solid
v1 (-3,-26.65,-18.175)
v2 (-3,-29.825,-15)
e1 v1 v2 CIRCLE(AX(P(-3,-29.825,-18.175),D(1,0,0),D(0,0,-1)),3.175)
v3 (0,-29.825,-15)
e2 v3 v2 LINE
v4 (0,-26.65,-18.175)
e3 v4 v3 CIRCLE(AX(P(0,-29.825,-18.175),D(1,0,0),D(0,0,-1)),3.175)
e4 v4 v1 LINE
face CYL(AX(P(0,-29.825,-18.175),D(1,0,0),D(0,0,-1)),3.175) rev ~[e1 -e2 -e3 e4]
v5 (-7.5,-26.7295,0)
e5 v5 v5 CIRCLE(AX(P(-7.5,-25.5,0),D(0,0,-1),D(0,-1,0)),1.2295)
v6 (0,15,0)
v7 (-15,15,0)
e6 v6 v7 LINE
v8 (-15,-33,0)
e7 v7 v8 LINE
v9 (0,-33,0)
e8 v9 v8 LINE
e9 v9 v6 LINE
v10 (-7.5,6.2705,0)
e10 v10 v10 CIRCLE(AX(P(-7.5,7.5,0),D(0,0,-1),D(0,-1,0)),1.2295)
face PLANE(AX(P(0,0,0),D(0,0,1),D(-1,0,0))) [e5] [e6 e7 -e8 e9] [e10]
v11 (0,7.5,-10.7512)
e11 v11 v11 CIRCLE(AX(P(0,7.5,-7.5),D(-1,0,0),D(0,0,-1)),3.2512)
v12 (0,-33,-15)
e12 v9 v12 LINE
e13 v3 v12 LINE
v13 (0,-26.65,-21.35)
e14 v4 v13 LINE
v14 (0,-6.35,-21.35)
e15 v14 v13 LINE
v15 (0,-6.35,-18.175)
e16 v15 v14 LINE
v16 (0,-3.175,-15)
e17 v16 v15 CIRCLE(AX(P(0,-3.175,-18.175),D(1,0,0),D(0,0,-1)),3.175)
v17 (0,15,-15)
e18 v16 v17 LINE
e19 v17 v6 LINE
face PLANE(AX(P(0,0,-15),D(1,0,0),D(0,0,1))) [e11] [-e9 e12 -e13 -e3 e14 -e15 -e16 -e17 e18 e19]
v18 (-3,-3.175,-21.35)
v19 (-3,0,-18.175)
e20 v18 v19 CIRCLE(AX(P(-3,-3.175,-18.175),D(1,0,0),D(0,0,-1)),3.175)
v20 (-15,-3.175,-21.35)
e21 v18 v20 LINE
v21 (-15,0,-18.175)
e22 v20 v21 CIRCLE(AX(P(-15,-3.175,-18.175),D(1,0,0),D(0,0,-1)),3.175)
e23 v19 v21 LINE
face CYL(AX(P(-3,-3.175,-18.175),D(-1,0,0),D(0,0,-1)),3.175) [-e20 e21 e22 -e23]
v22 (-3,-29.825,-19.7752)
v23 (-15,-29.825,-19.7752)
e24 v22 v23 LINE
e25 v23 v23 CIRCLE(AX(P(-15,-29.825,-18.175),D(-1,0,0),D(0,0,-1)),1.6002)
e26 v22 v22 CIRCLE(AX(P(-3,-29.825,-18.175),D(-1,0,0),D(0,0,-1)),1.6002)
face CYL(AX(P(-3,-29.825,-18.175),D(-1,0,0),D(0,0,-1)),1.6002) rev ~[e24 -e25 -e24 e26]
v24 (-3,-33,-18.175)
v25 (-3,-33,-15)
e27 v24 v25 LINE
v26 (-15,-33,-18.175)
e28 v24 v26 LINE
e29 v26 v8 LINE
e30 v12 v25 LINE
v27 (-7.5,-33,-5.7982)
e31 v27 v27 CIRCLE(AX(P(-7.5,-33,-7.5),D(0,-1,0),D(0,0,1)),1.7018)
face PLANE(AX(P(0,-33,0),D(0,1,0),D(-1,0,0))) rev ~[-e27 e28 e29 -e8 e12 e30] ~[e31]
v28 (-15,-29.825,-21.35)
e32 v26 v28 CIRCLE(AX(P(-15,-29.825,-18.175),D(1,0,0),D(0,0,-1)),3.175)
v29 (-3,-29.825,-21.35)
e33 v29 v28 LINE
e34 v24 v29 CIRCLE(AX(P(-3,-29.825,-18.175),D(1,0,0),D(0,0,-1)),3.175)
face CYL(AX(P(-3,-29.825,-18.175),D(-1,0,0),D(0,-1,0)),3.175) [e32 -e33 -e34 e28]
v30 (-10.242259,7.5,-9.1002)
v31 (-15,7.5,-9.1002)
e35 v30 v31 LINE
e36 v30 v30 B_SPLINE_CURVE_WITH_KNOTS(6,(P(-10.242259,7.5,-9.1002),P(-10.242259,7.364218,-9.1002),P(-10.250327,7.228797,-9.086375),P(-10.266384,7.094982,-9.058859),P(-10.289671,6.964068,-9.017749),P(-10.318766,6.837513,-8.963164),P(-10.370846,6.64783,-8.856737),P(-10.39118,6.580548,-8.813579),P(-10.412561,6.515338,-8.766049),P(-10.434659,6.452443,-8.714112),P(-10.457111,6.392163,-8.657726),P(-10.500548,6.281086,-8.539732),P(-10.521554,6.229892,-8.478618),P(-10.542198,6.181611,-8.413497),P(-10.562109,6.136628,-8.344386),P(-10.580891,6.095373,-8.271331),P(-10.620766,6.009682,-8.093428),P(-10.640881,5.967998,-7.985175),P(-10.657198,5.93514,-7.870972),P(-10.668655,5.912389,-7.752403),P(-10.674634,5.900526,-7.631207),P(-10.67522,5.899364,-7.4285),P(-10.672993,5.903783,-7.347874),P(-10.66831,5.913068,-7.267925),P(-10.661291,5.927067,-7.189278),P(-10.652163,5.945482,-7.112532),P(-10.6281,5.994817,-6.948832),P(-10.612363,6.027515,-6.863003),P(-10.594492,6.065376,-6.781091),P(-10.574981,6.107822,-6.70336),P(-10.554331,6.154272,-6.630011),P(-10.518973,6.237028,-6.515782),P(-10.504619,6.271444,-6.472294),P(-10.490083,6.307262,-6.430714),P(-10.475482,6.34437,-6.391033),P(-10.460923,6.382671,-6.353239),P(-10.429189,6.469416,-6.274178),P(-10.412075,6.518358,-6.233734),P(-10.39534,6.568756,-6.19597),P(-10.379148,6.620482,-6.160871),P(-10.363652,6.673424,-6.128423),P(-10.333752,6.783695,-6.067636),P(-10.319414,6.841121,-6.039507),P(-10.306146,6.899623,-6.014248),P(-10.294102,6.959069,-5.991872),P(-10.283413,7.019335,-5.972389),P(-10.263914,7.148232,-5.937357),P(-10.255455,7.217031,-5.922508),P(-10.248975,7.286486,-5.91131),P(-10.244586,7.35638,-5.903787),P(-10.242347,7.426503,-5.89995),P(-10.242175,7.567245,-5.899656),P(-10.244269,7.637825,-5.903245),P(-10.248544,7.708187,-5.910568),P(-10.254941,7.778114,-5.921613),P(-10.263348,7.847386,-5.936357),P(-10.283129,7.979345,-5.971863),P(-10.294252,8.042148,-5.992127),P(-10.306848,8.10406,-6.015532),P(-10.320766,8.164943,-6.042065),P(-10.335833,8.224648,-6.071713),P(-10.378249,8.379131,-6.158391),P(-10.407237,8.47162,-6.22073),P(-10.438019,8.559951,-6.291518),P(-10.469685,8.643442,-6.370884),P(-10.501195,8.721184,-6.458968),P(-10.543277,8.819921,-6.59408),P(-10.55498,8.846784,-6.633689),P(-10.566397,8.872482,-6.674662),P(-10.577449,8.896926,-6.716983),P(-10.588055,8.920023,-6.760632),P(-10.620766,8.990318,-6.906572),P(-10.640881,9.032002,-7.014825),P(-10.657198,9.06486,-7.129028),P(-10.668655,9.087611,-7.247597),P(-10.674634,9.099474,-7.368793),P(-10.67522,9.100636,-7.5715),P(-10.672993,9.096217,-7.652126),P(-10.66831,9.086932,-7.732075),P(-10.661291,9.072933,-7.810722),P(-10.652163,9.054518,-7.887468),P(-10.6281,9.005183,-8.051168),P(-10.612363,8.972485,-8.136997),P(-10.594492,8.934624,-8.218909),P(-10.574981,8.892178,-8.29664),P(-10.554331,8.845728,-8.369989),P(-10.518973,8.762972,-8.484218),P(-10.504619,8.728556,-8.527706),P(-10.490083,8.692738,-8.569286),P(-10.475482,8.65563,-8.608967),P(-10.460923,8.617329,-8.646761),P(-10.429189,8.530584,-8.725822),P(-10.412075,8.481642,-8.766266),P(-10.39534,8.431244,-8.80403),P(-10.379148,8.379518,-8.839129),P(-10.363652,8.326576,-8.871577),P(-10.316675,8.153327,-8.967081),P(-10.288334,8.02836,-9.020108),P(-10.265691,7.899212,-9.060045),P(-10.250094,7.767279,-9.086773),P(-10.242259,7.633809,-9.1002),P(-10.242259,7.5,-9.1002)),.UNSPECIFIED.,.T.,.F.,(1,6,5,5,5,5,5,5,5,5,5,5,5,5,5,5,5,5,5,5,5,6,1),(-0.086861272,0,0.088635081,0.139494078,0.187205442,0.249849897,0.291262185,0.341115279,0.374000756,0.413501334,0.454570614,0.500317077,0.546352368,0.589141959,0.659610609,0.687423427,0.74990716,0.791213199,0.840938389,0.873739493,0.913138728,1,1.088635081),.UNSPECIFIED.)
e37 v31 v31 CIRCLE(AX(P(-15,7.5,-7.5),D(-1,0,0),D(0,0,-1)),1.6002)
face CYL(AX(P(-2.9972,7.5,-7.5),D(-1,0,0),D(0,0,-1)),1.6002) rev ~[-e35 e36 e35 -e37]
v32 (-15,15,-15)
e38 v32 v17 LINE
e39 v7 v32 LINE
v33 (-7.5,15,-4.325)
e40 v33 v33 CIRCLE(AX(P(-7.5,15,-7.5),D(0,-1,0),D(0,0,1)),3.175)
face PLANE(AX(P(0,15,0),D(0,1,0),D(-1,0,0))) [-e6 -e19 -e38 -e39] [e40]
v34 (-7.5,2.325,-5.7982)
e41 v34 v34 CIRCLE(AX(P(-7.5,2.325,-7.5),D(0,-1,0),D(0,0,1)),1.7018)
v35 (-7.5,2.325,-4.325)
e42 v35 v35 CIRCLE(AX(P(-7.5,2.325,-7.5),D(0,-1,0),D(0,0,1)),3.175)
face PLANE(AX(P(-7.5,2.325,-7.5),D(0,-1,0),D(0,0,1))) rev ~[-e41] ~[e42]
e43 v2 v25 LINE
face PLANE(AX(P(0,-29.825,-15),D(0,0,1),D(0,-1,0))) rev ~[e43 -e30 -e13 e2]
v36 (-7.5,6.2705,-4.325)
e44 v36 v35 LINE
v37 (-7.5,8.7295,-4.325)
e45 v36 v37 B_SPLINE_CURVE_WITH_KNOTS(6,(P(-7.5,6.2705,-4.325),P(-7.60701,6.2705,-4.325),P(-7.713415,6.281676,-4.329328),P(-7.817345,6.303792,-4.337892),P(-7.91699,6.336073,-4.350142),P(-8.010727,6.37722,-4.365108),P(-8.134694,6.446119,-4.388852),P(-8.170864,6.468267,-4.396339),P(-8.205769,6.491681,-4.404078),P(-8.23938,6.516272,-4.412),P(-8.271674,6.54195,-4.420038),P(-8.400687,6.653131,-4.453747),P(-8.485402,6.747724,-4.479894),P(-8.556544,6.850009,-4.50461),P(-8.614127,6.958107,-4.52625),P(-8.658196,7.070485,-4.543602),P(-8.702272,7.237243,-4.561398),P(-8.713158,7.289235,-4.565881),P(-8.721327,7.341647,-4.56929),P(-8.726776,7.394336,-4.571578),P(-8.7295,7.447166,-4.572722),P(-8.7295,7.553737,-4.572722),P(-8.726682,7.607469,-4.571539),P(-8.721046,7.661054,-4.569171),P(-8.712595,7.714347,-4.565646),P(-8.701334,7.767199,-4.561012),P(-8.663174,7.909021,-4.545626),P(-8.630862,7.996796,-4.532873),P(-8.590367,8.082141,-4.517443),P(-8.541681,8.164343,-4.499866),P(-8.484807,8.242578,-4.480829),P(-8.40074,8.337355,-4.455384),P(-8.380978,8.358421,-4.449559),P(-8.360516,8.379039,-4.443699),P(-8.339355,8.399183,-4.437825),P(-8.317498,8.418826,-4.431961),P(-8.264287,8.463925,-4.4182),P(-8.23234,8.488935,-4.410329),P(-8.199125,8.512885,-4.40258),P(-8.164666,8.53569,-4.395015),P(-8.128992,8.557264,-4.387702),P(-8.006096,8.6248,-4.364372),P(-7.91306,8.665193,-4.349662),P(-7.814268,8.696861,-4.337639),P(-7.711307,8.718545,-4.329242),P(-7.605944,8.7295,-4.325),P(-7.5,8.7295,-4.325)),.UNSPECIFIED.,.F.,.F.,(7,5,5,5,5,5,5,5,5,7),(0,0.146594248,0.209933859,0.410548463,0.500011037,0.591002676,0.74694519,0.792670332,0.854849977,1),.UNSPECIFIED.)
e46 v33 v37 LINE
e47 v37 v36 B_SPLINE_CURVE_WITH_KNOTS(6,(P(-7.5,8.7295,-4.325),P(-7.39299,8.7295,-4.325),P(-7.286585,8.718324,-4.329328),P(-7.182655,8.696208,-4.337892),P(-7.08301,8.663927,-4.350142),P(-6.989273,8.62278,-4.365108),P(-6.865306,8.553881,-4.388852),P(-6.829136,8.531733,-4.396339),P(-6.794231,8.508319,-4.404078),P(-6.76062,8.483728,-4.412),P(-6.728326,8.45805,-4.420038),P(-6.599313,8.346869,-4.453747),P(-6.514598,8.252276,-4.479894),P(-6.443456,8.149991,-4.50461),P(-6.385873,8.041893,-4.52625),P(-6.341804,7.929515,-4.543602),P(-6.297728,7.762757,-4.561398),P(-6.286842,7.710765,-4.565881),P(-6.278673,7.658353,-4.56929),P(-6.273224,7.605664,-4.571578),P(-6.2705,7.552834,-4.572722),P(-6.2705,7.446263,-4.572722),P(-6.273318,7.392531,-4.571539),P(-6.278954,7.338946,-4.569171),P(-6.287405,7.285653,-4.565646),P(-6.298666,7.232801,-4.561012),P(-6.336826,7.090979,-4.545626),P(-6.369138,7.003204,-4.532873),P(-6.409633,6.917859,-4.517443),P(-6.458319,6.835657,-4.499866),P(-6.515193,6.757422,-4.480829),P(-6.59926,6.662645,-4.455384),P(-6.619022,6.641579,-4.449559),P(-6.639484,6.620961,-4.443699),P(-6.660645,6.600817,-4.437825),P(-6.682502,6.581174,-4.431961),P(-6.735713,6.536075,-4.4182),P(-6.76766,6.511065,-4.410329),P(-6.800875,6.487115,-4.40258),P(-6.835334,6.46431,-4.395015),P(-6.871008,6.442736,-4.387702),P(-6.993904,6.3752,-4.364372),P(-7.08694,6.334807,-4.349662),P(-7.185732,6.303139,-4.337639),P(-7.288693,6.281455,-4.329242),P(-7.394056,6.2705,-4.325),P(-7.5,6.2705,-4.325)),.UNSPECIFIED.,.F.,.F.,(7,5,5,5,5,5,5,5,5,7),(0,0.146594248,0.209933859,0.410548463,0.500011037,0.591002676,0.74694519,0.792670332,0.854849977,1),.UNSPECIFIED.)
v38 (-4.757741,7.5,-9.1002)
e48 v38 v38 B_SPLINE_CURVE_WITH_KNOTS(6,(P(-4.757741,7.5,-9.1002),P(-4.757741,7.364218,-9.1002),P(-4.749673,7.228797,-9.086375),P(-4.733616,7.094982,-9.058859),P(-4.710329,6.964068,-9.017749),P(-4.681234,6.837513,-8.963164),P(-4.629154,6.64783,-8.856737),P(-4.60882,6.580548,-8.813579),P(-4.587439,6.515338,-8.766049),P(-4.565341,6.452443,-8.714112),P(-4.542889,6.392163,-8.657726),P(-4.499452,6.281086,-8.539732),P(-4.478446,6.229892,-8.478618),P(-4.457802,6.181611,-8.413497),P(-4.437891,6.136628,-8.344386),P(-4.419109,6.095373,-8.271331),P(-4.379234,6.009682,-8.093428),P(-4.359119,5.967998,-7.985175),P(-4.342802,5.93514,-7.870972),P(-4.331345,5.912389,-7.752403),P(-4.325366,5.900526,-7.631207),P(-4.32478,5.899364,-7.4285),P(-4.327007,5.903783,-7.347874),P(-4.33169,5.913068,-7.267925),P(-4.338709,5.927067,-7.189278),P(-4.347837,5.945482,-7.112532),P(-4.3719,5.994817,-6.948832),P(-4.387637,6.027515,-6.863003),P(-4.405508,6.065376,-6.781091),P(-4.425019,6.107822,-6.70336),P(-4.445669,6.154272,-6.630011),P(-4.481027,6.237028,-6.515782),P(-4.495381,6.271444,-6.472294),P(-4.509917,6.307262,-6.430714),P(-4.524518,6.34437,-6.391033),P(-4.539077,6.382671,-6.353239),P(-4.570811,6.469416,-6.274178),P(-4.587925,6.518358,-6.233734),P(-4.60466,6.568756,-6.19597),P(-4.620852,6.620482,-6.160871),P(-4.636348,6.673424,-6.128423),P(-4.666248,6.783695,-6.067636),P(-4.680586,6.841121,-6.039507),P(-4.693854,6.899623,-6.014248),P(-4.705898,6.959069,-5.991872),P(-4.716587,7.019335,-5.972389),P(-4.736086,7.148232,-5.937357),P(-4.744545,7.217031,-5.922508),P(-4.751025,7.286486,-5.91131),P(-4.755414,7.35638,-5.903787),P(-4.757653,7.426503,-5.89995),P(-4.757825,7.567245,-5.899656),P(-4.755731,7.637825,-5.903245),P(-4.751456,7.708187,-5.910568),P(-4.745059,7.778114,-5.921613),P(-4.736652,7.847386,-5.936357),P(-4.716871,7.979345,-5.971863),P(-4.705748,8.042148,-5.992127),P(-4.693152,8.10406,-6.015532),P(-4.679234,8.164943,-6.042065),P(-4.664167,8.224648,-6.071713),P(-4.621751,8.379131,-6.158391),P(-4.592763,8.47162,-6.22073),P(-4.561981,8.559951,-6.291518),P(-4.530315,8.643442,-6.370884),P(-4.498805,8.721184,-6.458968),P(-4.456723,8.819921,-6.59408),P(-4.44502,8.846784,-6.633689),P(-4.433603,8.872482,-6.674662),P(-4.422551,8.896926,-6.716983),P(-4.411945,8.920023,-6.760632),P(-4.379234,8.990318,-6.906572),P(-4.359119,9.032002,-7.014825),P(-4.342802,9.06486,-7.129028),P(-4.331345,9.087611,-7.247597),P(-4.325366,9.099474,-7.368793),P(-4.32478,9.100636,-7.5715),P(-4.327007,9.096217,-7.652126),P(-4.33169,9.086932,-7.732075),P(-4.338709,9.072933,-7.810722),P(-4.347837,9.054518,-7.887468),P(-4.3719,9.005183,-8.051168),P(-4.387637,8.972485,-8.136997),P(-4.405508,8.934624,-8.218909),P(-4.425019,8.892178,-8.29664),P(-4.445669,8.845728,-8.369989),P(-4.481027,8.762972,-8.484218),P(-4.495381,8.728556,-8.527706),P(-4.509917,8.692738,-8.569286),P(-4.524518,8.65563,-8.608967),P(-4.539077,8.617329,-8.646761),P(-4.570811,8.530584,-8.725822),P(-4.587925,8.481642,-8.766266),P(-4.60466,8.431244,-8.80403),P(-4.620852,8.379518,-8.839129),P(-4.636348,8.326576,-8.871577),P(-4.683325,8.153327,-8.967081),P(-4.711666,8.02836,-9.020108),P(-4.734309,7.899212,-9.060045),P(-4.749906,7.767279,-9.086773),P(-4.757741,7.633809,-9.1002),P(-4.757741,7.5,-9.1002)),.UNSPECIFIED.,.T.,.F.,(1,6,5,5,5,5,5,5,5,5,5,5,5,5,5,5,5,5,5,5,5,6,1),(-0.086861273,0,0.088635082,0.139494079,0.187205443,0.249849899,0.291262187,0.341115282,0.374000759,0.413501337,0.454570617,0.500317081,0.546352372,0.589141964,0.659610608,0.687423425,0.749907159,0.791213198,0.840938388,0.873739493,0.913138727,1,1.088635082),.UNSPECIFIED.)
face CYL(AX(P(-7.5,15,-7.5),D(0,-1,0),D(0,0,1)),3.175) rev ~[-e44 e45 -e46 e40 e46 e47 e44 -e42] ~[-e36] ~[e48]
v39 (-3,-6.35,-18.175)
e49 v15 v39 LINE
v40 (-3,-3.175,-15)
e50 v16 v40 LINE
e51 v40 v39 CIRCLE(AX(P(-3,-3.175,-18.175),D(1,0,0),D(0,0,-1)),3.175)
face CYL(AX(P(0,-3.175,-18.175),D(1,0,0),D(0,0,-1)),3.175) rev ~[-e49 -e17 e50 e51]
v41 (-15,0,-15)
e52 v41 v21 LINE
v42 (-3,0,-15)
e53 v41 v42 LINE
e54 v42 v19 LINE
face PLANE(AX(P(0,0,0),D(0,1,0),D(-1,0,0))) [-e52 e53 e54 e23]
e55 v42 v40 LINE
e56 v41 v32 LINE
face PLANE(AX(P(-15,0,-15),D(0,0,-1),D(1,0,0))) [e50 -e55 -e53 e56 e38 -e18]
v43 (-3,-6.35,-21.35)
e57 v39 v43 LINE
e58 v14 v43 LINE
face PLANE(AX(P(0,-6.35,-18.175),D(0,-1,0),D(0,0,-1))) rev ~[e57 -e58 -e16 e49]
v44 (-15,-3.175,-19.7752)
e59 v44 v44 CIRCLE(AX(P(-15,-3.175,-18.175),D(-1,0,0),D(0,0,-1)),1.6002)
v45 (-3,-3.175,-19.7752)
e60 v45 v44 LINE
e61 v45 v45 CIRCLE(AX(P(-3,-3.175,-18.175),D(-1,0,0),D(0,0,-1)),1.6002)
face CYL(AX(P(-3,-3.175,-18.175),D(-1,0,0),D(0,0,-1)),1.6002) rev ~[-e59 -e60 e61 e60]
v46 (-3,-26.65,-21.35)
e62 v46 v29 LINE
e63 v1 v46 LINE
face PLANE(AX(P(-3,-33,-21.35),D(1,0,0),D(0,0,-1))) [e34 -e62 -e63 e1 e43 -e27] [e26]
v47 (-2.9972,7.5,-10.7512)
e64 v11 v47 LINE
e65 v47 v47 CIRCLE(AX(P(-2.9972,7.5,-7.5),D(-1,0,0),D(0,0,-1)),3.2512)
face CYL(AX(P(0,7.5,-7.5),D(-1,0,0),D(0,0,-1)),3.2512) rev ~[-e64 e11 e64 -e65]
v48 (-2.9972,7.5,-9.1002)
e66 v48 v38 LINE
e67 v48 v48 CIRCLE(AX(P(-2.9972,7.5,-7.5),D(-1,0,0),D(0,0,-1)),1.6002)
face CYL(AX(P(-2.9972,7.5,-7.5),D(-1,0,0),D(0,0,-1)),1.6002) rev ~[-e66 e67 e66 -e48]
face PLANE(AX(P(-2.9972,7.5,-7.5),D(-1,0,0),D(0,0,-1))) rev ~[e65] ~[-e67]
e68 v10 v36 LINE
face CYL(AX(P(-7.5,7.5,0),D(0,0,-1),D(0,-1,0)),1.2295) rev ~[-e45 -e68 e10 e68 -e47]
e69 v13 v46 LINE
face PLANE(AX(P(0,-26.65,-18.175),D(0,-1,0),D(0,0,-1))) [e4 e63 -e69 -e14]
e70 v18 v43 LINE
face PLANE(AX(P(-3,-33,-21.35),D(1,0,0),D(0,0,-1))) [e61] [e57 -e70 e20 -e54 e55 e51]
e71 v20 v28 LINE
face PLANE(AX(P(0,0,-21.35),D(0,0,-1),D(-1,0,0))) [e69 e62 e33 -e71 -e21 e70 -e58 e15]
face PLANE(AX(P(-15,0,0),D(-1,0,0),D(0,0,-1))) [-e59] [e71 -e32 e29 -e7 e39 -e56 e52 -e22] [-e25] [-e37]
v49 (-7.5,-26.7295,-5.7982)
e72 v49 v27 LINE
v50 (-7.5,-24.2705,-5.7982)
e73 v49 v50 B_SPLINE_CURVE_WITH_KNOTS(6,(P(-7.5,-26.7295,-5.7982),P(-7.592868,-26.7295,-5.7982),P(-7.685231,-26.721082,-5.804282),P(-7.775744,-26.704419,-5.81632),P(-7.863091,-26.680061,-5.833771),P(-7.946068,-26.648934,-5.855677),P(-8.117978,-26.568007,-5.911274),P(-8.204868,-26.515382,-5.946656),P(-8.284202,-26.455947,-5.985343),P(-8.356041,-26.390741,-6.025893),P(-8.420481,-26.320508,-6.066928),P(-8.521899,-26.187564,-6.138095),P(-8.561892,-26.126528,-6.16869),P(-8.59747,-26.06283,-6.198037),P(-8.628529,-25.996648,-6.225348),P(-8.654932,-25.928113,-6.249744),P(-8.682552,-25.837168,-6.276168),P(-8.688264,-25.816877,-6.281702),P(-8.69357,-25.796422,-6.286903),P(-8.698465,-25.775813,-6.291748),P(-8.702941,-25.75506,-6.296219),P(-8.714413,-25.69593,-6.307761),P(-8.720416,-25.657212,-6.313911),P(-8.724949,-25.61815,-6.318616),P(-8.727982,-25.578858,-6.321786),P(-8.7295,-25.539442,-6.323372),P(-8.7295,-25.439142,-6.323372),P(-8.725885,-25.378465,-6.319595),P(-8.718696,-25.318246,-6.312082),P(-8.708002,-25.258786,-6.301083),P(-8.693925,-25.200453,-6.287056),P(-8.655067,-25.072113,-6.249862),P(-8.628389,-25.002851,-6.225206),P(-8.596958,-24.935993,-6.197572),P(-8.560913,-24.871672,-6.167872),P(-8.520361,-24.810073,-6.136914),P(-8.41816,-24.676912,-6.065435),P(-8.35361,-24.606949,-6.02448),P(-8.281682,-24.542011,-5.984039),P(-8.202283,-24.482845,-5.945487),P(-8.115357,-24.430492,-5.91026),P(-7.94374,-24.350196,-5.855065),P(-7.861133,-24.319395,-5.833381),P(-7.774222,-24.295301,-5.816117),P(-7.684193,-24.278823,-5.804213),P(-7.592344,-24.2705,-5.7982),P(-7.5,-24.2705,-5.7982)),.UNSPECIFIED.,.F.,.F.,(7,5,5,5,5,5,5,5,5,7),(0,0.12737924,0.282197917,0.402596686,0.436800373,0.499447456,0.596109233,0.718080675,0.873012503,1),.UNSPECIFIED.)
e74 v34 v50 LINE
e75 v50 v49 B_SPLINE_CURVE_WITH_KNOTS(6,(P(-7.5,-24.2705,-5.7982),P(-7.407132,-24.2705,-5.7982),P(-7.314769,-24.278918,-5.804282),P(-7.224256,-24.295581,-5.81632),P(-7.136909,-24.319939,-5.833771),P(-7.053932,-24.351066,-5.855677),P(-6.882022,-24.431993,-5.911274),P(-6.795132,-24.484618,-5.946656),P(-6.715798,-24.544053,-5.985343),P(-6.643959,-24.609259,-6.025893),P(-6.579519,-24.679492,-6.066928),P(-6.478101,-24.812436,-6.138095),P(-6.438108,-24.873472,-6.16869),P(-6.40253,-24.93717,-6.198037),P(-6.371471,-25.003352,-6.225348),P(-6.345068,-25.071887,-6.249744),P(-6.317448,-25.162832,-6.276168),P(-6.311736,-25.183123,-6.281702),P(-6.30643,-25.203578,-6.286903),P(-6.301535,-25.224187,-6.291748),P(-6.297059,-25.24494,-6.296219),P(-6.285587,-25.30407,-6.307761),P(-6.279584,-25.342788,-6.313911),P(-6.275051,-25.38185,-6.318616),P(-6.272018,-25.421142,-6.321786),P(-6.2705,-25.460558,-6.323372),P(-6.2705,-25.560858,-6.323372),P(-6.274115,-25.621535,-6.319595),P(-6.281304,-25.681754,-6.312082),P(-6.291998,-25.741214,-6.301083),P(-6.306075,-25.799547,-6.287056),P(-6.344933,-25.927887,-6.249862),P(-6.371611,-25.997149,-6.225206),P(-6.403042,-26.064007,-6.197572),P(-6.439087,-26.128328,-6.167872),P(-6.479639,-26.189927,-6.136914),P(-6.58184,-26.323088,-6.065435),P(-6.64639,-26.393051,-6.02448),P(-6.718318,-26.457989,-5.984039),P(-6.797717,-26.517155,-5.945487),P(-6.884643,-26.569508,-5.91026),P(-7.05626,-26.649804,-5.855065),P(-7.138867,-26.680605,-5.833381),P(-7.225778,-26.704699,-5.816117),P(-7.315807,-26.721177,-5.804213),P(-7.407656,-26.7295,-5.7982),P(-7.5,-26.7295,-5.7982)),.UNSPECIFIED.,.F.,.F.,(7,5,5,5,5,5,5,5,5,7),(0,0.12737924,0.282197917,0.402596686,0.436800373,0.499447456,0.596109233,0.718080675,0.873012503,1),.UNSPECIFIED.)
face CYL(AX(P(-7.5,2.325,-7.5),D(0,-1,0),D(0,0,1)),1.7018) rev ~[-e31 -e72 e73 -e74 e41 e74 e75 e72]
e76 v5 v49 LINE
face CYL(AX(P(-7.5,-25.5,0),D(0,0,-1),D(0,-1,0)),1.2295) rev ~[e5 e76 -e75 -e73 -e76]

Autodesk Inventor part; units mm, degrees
ref_plane "YZ Plane" through (0, 0, 0) normal (1, 0, 0) x (0, 1, 0)
ref_plane "XZ Plane" through (0, 0, 0) normal (0, 1, 0) x (-1, 0, 0)
ref_plane "XY Plane" through (0, 0, 0) normal (0, 0, 1) x (1, 0, 0)
sketch "Base Profile" plane through (0, 0, 0) normal (0, 1, 0) x (-1, 0, 0)
  line L0 (0, 0) -> (15, 0)
  line L1 (15, 0) -> (15, -15)
  line L2 (15, -15) -> (0, -15)
  line L3 (0, -15) -> (0, 0)
  line L4 (15, -15) -> (15, 0)
  line L5 (15, -15) -> (0, -15)
  line L6 (0, -15) -> (0, -21.35)
  line L7 (0, -21.35) -> (15, -21.35)
  line L8 (15, -21.35) -> (15, -15)
  dimension "d164" = 15
  dimension "d165" = 15
  dimension "d360" = 6.35
extrude "Stock" add sketch "Base Profile" against normal blind 33
extrude "Extrusion Post" add sketch "Base Profile" along normal blind 15 contours L0 L1 L2 L3
sketch "Front Pattern" plane through (0, -33, -21.35) normal (1, 0, 0) x (0, 0, -1)
  line L0 (-21.35, 0) -> (-21.35, 48) projected
  line L1 (0, 0) -> (-21.35, 0) projected
  line L2 (0, 33) -> (0, 0) projected
  line L3 (-6.35, 33) -> (0, 33) projected
  line L4 (-6.35, 33) -> (-6.35, 48) projected
  line L5 (-21.35, 48) -> (-6.35, 48) projected
  circle A0 centre (-13.85, 40.5) radius 3.175
  line L6 (-6.35, 33) -> (-6.35, 0)
  line L7 (-6.35, 16.5) -> (0, 16.5) construction
  circle A1 centre (-3.175, 29.825) radius 3.175
  circle A2 centre (-3.175, 3.175) radius 3.175
  line L8 (-3.175, 26.65) -> (0, 26.65)
  line L9 (-3.175, 6.35) -> (0, 6.35)
  line L10 (-6.35, 33) -> (0, 33) projected
  point P0 (-3.175, 16.5)
  point P1 (0, 3.175)
  point P2 (0, 29.825)
  point P3 (-6.35, 3.175)
  point P4 (-6.35, 29.825)
  point P5 (-3.175, 0)
  point P6 (-3.175, 33)
  dimension "d408" = 6.35
  dimension "d361" = 6.35
  dimension "d362" = 7.5
  dimension "d363" = 7.5
hole "Hole24" at (0, 7.5, -7.5) direction (-1, 0, 0) diameter 3.2004 end through all counterbore diameter 6.5024 counterbore depth 2.9972 clearance for "Socket Head Cap Screw" size "M3" standard "Ansi Metric M Profile"
hole "Hole23" at (0, -3.175, -18.175) at (0, -29.825, -18.175) direction (-1, 0, 0) diameter 3.2004 end through all counterbore diameter 6.35 counterbore depth 3 clearance for "Socket Head Cap Screw" size "M3" standard "Ansi Metric M Profile"
sketch "Sketch36" plane through (0, 15, 0) normal (0, 1, 0) x (1, 0, 0)
  line L0 (-15, 15) -> (-15, 0) projected
  line L1 (-15, 0) -> (0, 0) projected
  line L2 (0, 0) -> (0, 15) projected
  line L3 (0, 15) -> (-15, 15) projected
  circle A0 centre (-7.5, 7.5) radius 3.175
  dimension "d385" = 6.35
  dimension "d386" = 7.5
  dimension "d387" = 7.5
hole "Hole25" at (-7.5, 15, -7.5) direction (0, -1, 0) diameter 3.4036 end through all counterbore diameter 6.35 counterbore depth 12.675 clearance for "Socket Head Cap Screw" size "M3" standard "Ansi Metric M Profile"
sketch "Left Pattern" plane through (-15, -33, 0) normal (0, 0, 1) x (1, 0, 0)
  line L0 (0, 0) -> (0, 48) projected
  line L1 (15, 0) -> (0, 0) projected
  line L2 (15, 0) -> (15, 48) projected
  line L3 (0, 48) -> (15, 48) projected
  circle A0 centre (7.5, 40.5) radius 1.5
  circle A1 centre (7.5, 7.5) radius 1.5
  dimension "d395" = 3
  dimension "d396" = 7.5
  dimension "d397" = 7.5
  dimension "d398" = 3
  dimension "d399" = 7.5
hole "Hole26" at (-7.5, 7.5, 0) at (-7.5, -25.5, 0) direction (0, 0, -1) diameter 2.459 end up to surface thread size "M3x0.5" class "6H" standard "ANSI Metric M Profile"
extrude "Extrusion21" cut sketch "Front Pattern" against normal up to surface (3 mm away) contours L6 A2 L1 | A2 L2 L1 | A2 | L3 A1 L6 | A2 L9 L2 | A1 | L3 L2 A1 | A1 L2 L8
fillet "Fillet4" radius 3.175 2 edges at (-9, 0, -21.35) (-9, -33, -21.35)
equation "\"d164\" = extrusionWidth"
equation "\"d168\" = extrusionOffset"
equation "\"extrusionWidth\" = 15"
equation "\"idlerLength\" = 18"
equation "\"bearingOffsetFromBottom\" = 7.5"
equation "\"extrusionOffset\" = 33"
equation "\"bearingStackHeight\" = 9"
equation "\"bearingSlotLength\" = 5"
equation "\"bearingClearance\" = 13"
equation "\"pinSupportLength\" = 2"
properties part number "A Idler" material "Aluminum 6061"
